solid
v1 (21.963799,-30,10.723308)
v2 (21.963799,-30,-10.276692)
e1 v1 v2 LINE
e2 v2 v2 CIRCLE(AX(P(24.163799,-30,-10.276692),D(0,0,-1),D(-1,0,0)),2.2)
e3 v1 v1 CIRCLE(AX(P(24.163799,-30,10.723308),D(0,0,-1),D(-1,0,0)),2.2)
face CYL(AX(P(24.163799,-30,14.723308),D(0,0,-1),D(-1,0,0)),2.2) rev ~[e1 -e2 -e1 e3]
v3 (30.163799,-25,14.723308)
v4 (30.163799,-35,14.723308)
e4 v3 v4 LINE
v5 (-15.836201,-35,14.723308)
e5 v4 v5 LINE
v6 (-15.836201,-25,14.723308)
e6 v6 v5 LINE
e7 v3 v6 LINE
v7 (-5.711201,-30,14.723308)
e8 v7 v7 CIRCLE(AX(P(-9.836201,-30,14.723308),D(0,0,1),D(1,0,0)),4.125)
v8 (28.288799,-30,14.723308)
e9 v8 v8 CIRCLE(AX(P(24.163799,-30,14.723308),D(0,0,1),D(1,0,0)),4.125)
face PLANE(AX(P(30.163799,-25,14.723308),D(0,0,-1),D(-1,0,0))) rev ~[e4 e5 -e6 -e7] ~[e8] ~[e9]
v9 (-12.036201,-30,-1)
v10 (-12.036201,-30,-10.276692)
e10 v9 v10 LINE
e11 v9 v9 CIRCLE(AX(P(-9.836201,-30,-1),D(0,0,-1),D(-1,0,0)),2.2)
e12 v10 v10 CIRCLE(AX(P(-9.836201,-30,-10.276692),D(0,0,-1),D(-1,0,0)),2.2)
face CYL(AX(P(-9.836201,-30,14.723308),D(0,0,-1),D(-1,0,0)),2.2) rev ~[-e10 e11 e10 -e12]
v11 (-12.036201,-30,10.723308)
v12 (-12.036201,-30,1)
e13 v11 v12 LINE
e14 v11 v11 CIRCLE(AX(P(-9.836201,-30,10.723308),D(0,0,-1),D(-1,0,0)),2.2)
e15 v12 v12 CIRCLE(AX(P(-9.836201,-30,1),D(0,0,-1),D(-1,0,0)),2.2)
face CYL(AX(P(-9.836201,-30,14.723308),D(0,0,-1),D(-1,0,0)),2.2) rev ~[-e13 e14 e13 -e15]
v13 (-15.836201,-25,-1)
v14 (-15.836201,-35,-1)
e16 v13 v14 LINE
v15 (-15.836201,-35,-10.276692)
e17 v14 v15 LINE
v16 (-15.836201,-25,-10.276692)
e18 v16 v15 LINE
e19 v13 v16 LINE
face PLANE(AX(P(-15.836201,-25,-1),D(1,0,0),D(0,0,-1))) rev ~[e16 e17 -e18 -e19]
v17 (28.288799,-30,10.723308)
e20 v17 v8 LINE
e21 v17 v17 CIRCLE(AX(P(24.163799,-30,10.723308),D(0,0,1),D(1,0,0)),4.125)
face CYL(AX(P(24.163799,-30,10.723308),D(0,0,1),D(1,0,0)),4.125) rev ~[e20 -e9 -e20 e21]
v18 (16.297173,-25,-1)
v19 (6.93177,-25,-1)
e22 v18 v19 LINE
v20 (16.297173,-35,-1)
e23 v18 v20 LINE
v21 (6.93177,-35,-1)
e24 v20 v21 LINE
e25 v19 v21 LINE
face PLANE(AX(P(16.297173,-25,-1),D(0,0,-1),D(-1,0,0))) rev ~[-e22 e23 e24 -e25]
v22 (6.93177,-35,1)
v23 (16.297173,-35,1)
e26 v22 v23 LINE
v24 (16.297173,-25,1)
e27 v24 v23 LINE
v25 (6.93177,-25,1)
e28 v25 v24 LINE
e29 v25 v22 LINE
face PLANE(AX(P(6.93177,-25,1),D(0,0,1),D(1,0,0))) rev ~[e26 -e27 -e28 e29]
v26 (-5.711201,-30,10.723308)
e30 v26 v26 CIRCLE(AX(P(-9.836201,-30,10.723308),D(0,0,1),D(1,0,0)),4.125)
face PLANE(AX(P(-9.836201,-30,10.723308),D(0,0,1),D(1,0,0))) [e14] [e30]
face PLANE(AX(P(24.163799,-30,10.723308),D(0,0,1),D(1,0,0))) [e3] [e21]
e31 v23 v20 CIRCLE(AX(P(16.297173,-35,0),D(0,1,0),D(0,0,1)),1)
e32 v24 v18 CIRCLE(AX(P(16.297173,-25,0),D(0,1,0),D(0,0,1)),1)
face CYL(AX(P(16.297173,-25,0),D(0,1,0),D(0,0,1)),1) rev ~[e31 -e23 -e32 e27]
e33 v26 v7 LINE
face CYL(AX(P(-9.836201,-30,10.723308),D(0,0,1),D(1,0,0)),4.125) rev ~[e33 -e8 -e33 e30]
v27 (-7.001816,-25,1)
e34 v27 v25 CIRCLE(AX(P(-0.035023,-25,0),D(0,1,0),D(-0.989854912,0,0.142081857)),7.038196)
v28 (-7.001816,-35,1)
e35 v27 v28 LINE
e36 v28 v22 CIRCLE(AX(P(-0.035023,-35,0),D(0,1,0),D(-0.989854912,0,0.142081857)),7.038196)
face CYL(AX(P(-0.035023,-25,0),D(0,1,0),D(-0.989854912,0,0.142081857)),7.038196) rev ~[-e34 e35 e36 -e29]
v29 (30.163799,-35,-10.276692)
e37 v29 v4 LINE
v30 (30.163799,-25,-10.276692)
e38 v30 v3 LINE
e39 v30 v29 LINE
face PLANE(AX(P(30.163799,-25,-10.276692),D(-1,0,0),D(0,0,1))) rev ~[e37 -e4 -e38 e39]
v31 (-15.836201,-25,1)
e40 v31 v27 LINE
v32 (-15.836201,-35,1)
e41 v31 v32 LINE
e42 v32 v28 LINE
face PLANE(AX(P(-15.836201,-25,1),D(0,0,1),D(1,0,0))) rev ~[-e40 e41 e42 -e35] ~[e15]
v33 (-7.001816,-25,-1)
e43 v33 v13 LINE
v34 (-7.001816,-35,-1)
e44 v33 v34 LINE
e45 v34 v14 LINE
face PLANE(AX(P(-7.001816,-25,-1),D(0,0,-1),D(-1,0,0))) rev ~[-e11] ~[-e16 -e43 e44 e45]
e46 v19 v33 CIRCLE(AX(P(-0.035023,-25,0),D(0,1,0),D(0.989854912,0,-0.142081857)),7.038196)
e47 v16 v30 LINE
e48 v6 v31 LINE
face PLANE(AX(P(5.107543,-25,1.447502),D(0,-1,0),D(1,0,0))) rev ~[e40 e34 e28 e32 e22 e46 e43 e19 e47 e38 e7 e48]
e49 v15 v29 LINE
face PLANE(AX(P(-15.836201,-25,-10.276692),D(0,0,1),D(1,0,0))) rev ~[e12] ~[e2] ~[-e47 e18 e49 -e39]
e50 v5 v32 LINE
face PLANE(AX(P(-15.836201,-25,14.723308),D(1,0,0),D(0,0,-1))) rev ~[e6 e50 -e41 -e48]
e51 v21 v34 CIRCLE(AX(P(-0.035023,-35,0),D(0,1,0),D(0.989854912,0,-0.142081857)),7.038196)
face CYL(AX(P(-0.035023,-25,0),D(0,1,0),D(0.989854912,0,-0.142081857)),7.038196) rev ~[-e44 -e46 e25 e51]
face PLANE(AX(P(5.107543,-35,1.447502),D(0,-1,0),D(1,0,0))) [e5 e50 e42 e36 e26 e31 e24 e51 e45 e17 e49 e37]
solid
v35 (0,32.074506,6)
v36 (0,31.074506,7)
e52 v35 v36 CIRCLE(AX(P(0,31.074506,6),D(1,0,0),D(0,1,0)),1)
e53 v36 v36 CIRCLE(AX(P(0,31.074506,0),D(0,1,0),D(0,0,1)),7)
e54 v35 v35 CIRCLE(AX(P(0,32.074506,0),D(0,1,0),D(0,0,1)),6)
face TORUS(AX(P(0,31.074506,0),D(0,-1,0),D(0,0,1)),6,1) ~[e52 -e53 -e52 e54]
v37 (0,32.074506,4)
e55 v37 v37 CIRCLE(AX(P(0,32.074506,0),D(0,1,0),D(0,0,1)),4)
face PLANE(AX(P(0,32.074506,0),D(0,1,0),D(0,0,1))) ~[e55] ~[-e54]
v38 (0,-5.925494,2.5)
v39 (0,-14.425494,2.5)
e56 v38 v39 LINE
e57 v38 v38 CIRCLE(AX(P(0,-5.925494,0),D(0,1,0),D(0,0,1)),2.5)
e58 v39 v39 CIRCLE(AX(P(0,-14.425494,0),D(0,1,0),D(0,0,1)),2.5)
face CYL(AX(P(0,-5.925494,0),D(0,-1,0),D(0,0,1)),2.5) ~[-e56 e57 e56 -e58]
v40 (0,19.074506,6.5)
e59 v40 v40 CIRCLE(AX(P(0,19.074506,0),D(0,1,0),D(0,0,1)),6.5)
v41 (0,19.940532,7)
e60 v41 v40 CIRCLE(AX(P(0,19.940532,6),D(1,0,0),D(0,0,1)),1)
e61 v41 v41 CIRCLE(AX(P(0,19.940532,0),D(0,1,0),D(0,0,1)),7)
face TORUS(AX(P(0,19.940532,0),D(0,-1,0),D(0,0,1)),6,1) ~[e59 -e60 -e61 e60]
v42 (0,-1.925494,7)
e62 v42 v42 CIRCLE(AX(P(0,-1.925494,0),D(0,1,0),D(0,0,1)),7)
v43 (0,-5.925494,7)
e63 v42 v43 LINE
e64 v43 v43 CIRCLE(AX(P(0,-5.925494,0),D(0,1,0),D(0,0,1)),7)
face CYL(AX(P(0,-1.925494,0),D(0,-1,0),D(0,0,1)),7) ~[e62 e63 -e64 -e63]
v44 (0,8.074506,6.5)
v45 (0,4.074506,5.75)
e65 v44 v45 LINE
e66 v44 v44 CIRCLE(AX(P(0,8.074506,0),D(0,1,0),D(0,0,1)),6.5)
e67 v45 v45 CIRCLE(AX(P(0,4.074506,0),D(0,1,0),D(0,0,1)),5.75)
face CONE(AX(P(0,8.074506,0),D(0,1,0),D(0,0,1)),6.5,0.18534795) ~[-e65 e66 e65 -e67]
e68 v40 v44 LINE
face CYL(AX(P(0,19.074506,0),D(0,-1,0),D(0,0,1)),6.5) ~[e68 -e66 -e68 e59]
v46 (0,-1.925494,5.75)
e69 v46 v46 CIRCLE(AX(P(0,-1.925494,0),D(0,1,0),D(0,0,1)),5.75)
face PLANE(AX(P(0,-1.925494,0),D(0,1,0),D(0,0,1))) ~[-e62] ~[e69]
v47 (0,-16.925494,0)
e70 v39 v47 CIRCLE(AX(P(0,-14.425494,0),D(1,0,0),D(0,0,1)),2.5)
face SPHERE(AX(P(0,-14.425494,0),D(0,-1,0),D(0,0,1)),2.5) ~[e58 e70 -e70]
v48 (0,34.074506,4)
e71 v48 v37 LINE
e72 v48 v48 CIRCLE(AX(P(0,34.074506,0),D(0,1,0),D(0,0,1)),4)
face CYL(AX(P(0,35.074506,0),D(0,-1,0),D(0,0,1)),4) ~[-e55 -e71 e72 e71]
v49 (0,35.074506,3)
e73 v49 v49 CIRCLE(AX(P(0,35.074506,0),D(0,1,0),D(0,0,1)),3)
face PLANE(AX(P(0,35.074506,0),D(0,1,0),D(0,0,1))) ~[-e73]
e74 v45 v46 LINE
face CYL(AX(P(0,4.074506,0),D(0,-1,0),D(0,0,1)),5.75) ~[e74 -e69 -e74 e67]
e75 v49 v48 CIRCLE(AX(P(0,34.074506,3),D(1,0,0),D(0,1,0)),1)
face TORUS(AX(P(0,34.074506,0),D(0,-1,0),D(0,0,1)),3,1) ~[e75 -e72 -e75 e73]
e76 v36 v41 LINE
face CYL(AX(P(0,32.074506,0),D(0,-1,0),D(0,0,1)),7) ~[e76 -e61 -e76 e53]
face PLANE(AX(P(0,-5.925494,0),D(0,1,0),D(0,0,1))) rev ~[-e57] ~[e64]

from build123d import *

# Parameters (mm, degrees)
F3_R           = 2.5
F6_DEPTH       = 10
F8_D           = 4.4
F8_CBORE_D     = 8.25
F8_CBORE_DEPTH = 4


# Not quite as in the source:
# - a fillet or chamfer that OpenCascade refuses, or shapes differently, is made with other operations: its cross-section is extruded or revolved along the edge and cut away or added


with BuildPart() as f1:
    # F0 (on Right) → F1 (revolve)
    with BuildSketch(Plane.YZ):
        Polygon((8.0745064616, 6.5), (4.0745064616, 5.75), (-1.9254935384, 5.75), (-1.9254935384, 7), (-5.9254935384, 7), (-5.9254935384, 2.5), (-16.9254935384, 2.5), (-16.9254935384, 0), (35.0745064616, 0), (35.0745064616, 4), (32.0745064616, 4), (32.0745064616, 7), (19.0745064616, 7), (19.0745064616, 6.5), align=None)
    revolve(axis=Axis((0, 9.0745064616, 0), (0, 1, 0)))

    # F2: fillet of radius 1 on 3 edges, made by hand

    # F2_s1 → F2_t2 (revolve, cut)
    with BuildSketch(Plane.YZ):
        with BuildLine():
            ThreePointArc((35.0745064616, 3), (34.7816132428, 3.7071067812), (34.0745064616, 4))
            Line((34.0745064616, 4), (34.0745064616, 4.02))
            Line((34.0745064616, 4.02), (35.0945064616, 4.02))
            Line((35.0945064616, 4.02), (35.0945064616, 3))
            Line((35.0945064616, 3), (35.0745064616, 3))
        make_face()
    revolve(axis=Axis((0, 35.0745064616, 0), (0, 1, 0)), mode=Mode.SUBTRACT)

    # F2_s3 → F2_t4 (revolve, cut)
    with BuildSketch(Plane.YZ):
        with BuildLine():
            ThreePointArc((32.0745064616, 6), (31.7816132428, 6.7071067812), (31.0745064616, 7))
            Line((31.0745064616, 7), (31.0745064616, 7.02))
            Line((31.0745064616, 7.02), (32.0945064616, 7.02))
            Line((32.0945064616, 7.02), (32.0945064616, 6))
            Line((32.0945064616, 6), (32.0745064616, 6))
        make_face()
    revolve(axis=Axis((0, 32.0745064616, 0), (0, 1, 0)), mode=Mode.SUBTRACT)

    # F2_s5 → F2_t6 (revolve, cut)
    with BuildSketch(Plane.YZ):
        with BuildLine():
            ThreePointArc((19.9405318654, 7), (19.4405318654, 6.8660254038), (19.0745064616, 6.5))
            Line((19.0745064616, 6.5), (19.0571859535, 6.51))
            ThreePointArc((19.0571859535, 6.51), (19.0545064616, 6.75), (19.0545064616, 7))
            Line((19.0545064616, 7), (19.0745064616, 7.02))
            Line((19.0745064616, 7.02), (19.9405318654, 7.02))
            Line((19.9405318654, 7.02), (19.9405318654, 7))
        make_face()
    revolve(axis=Axis((0, 19.0745064616, 0), (0, 1, 0)), mode=Mode.SUBTRACT)

    # F3
    f3_edges = [f1.edges().sort_by_distance(p)[0] for p in [
        (0, -16.925494, -2.5),
    ]]
    fillet(f3_edges, radius=F3_R)


with BuildPart() as f6:
    # F5 (on offset) → F6 (new body)
    with BuildSketch(Plane.XZ.offset(25)):
        with BuildLine():
            Line((-15.8362010978, -10.2766921259), (30.1637989022, -10.2766921259))
            Line((30.1637989022, -10.2766921259), (30.1637989022, 14.7233078741))
            Line((30.1637989022, 14.7233078741), (-15.8362010978, 14.7233078741))
            Line((-15.8362010978, 14.7233078741), (-15.8362010978, 1))
            Line((-15.8362010978, 1), (-7.0018163238, 1))
            ThreePointArc((-7.0018163238, 1), (-0.0350231516, 7.0381962962), (6.9317700206, 1))
            Line((6.9317700206, 1), (16.2971732207, 1))
            ThreePointArc((16.2971732207, 1), (17.2971732207, 0), (16.2971732207, -1))
            Line((16.2971732207, -1), (6.9317700206, -1))
            ThreePointArc((6.9317700206, -1), (-0.0350231516, -7.0381962962), (-7.0018163238, -1))
            Line((-7.0018163238, -1), (-15.8362010978, -1))
            Line((-15.8362010978, -1), (-15.8362010978, -10.2766921259))
        make_face()
    extrude(amount=F6_DEPTH)

    # F8 (through all)
    with Locations(Plane.XY.offset(14.7233078741)):
        with Locations((24.1637989022, -30), (-9.8362010978, -30)):
            CounterBoreHole(F8_D / 2, F8_CBORE_D / 2, F8_CBORE_DEPTH)


solid = Compound([f1.part, f6.part])
